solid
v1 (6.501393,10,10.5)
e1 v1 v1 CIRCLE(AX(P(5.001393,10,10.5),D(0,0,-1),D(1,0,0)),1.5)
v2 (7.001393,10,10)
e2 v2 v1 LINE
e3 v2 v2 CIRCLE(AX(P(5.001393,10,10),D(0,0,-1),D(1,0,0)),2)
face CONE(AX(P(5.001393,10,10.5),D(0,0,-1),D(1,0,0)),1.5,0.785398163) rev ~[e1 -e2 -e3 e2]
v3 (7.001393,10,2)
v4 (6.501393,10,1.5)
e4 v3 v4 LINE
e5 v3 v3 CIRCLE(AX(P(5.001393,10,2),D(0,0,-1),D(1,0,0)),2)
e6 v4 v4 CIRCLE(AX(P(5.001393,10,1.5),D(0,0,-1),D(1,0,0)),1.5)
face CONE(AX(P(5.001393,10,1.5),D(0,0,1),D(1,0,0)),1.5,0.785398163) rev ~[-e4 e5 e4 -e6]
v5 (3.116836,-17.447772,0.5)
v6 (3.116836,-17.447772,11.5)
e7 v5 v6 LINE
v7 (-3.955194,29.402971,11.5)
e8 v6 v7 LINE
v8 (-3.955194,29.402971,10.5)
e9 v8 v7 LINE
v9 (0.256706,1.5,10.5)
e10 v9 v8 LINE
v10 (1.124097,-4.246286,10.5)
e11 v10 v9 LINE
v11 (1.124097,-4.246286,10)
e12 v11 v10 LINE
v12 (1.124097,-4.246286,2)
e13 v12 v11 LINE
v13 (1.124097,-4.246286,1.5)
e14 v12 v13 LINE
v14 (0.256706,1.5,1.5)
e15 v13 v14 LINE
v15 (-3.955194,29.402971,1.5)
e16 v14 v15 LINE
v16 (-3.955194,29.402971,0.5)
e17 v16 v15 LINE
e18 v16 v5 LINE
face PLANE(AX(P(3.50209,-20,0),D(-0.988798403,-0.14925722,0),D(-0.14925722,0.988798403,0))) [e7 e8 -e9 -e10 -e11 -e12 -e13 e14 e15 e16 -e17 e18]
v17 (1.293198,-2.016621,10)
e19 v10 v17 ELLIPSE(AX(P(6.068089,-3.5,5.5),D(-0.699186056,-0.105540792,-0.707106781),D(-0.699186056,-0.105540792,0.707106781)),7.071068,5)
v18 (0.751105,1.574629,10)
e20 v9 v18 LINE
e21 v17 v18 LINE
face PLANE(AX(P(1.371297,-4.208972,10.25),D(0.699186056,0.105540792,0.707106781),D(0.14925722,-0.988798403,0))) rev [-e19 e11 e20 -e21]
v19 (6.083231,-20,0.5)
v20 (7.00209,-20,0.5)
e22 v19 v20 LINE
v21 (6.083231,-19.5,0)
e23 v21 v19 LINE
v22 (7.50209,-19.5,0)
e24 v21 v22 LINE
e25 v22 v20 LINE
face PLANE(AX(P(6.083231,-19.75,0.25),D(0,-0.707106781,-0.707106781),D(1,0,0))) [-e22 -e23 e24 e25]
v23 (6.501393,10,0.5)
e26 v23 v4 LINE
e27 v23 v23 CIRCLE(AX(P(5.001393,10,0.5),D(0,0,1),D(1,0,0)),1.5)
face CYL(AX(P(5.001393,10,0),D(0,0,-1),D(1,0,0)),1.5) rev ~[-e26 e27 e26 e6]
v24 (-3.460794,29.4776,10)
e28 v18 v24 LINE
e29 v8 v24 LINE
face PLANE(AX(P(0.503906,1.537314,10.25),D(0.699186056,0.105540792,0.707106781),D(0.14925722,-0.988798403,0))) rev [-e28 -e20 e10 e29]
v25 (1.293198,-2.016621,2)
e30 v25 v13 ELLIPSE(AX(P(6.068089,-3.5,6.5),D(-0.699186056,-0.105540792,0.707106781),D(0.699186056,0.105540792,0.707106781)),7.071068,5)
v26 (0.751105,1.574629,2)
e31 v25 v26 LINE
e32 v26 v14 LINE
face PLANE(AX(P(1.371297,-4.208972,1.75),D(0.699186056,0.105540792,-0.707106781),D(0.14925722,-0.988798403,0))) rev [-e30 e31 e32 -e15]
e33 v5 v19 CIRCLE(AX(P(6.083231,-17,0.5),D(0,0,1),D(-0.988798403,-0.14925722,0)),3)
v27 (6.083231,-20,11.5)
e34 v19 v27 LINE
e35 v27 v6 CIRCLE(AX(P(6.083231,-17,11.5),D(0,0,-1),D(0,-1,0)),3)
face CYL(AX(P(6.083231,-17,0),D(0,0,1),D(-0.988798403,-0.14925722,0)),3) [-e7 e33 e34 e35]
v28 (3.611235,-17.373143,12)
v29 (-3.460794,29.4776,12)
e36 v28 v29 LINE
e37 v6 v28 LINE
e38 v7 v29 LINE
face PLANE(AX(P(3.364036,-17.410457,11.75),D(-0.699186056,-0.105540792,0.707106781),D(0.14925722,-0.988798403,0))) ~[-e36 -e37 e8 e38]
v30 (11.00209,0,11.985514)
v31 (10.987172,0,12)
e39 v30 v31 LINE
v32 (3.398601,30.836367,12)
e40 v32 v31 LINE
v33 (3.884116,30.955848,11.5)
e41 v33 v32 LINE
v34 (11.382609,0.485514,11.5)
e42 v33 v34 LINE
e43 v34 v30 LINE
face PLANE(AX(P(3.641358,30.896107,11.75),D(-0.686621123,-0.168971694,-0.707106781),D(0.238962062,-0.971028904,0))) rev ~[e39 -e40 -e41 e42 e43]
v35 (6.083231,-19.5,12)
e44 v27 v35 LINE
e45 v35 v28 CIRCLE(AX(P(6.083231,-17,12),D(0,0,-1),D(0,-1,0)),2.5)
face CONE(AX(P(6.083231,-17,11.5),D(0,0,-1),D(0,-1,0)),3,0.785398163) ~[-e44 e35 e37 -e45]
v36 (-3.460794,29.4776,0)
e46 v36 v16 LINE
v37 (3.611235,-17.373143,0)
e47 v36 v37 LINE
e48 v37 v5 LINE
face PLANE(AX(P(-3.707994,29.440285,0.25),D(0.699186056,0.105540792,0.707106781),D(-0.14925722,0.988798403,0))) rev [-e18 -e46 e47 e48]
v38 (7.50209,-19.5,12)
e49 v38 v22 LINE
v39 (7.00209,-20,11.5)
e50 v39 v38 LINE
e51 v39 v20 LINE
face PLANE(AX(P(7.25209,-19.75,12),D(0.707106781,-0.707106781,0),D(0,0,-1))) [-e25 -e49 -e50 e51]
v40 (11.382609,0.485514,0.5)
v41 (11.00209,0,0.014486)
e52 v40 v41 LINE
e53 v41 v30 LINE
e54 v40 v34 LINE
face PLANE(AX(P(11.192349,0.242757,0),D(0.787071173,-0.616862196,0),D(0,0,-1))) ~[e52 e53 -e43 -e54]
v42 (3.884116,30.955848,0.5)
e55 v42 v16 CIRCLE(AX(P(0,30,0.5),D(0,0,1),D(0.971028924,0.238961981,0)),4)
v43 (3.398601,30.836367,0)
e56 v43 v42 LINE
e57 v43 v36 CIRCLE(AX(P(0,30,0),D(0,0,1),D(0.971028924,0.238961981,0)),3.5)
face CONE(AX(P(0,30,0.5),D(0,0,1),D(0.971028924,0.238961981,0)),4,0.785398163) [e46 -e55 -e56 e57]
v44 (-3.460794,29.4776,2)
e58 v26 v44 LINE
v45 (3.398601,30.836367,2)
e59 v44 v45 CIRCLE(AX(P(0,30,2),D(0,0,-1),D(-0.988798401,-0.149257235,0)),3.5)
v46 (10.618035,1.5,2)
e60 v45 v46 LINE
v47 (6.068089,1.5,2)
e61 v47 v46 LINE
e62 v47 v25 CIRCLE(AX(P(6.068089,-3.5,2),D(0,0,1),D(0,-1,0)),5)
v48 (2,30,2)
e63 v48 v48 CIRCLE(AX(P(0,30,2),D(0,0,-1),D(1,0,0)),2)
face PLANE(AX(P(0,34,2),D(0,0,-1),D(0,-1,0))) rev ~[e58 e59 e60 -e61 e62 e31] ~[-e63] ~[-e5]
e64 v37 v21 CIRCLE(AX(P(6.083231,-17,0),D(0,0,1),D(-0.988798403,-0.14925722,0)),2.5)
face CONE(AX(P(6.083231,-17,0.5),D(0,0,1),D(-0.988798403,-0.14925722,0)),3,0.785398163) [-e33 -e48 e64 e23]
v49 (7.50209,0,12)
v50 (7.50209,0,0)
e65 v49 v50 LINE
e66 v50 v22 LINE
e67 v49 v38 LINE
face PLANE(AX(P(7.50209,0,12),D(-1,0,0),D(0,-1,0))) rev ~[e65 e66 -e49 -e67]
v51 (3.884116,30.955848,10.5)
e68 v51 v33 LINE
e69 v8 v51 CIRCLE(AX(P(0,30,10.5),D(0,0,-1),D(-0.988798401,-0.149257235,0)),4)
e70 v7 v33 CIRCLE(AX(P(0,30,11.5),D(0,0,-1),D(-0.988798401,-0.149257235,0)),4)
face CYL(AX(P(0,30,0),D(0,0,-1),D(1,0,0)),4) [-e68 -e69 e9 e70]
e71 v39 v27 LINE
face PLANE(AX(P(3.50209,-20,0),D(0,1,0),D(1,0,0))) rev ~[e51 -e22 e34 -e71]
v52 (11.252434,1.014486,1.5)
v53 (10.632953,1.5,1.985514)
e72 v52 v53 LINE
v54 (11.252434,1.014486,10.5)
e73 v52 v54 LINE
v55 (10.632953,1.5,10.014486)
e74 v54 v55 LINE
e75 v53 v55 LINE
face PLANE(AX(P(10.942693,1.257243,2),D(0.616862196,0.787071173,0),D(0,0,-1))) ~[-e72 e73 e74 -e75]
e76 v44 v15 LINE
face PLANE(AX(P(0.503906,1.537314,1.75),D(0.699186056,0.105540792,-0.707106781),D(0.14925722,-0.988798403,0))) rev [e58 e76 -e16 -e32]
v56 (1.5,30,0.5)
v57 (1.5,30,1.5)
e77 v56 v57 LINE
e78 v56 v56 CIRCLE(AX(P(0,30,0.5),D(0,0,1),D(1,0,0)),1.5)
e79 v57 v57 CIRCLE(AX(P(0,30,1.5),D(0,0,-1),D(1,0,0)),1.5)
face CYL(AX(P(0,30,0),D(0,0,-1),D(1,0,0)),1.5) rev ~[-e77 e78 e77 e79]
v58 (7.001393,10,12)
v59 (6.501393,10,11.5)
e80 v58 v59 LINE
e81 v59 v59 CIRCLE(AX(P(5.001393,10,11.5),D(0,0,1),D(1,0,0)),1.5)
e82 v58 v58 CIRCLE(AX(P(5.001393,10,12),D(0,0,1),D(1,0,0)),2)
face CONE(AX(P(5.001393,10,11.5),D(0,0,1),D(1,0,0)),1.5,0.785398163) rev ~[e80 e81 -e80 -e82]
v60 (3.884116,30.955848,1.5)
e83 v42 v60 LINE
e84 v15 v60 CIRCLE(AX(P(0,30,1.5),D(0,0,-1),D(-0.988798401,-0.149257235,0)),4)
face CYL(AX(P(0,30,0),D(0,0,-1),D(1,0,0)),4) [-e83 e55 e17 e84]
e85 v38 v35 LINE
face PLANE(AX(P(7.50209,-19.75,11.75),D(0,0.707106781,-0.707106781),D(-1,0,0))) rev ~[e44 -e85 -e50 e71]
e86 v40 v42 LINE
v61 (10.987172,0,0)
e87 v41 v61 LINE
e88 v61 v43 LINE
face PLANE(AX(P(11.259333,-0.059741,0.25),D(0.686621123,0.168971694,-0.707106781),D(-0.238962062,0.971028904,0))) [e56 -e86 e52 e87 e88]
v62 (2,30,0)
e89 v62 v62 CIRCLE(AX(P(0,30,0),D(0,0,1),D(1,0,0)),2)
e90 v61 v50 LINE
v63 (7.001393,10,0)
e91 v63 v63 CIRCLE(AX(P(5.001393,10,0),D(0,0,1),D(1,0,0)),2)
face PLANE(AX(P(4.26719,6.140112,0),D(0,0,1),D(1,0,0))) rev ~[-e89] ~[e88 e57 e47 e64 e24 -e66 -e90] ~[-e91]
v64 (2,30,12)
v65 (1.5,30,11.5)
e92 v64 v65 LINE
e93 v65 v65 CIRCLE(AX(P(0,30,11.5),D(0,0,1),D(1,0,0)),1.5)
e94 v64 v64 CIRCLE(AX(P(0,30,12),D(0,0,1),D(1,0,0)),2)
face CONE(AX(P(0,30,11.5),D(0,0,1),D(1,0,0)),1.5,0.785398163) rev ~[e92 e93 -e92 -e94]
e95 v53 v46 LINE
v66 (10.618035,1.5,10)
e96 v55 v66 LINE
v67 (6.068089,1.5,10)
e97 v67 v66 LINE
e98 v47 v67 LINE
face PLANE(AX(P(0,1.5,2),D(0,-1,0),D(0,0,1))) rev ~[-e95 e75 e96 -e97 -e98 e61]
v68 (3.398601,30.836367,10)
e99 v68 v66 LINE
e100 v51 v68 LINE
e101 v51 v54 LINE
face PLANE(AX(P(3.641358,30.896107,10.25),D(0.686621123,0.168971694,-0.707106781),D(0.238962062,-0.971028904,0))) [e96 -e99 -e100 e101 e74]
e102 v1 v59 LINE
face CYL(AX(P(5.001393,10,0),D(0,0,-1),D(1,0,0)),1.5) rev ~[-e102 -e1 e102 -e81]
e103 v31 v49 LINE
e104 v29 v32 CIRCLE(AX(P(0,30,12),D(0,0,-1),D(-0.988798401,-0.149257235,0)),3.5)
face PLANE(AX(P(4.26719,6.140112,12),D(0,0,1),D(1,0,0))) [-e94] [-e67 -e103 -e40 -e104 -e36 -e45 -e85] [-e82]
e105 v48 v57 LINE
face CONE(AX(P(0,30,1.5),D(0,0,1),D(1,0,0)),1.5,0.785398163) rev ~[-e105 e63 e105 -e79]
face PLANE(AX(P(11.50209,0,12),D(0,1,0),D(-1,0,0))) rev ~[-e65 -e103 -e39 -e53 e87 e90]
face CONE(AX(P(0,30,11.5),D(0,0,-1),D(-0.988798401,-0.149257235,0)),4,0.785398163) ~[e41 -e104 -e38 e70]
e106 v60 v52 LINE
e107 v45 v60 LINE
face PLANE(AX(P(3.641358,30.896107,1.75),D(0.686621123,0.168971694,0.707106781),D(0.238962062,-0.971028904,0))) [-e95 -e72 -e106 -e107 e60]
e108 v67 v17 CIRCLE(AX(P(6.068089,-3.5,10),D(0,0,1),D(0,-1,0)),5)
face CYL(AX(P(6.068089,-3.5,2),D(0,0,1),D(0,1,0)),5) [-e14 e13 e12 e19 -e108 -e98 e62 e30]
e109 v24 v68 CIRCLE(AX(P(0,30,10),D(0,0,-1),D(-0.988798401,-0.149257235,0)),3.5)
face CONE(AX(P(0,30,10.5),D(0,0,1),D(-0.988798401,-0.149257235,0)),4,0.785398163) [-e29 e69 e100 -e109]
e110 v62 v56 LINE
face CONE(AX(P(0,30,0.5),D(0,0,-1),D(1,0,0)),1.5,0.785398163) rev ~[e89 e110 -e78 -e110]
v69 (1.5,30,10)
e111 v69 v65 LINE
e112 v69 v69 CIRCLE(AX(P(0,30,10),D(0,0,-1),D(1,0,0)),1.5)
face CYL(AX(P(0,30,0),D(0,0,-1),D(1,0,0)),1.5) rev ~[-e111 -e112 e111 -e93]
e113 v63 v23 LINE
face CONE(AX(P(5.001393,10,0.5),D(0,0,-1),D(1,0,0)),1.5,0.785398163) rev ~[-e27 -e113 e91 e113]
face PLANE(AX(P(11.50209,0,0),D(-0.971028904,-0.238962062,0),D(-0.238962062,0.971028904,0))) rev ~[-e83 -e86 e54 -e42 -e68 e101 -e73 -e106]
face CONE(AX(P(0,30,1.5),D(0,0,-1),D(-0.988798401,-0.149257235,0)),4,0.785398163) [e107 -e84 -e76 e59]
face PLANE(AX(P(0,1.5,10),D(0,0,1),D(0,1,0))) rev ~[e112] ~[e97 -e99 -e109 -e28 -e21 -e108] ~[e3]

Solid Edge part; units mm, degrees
sketch "Sketch1" plane through (0, 0, 0) normal (0, 0, 1) x (1, 0, 0)
  line L0 (11.50209, -20) -> (11.50209, 0)
  line L1 (11.50209, 0) -> (3.884116, 30.955848)
  line L2 (3.50209, -20) -> (-3.955194, 29.402971)
  line L3 (3.50209, -20) -> (11.50209, -20)
  arc A0 (-3.955198, 29.403) -> (3.884126, 30.955806) centre (0, 30) cw
  circle A1 centre (5.001393, 10) radius 1.5
  circle A2 centre (0, 30) radius 1.5
extrude "Protrusion1" add sketch "Sketch1" along normal blind 12
sketch "Sketch2" plane through (3.751045, 7, 12) normal (0, 0, 1) x (0, -1, 0)
  line L0 (27, 3.751045) -> (27, 7.751045)
  line L1 (27, 7.751045) -> (7, 7.751045)
  line L2 (7, 7.751045) -> (7, 3.751045)
  line L3 (7, 3.751045) -> (27, 3.751045)
extrude "Cutout1" cut sketch "Sketch2" against normal through all
sketch "Sketch3" plane through (0, 0, 0) normal (1, 0, 0) x (0, 1, 0)
  line L0 (1.5, 10) -> (34, 10)
  line L1 (34, 10) -> (34, 2)
  line L2 (34, 2) -> (1.5, 2)
  line L3 (1.5, 2) -> (1.5, 10)
extrude "Cutout2" cut sketch "Sketch3" along normal through all and the other way through all
fillet "Redondeo_1" radius 5 1 edges at (0.256706, 1.5, 6)
fillet "Redondeo_2" radius 3 1 edges at (3.50209, -20, 6)
chamfer "Chaflán_1" distance 0.5 angle 45 25 edges at (-0.419179, 5.9776, 12) (-0.777251, 33.923758, 12) (7.693103, 15.477924, 12) (11.50209, 0, 6) (7.693103, 15.477924, 0) (-0.777251, 33.923758, 0) (-0.419179, 5.9776, 0) (4.126616, -19.274128, 12) (6.792661, -20, 12) (4.126616, -19.274128, 0) (6.792661, -20, 0) (-1.415548, 12.578343, 10) (-0.777251, 33.923758, 10) (7.508534, 16.227924, 10) (11.132952, 1.5, 6) (7.508534, 16.227924, 2) (-1.415548, 12.578343, 2) (0, 28.5, 2) (5.001393, 8.5, 2) (3.501393, 10, 12) (-1.5, 30, 12) (-1.5, 30, 0) (3.501393, 10, 0) (3.501393, 10, 10) (7.50209, -20, 6)
